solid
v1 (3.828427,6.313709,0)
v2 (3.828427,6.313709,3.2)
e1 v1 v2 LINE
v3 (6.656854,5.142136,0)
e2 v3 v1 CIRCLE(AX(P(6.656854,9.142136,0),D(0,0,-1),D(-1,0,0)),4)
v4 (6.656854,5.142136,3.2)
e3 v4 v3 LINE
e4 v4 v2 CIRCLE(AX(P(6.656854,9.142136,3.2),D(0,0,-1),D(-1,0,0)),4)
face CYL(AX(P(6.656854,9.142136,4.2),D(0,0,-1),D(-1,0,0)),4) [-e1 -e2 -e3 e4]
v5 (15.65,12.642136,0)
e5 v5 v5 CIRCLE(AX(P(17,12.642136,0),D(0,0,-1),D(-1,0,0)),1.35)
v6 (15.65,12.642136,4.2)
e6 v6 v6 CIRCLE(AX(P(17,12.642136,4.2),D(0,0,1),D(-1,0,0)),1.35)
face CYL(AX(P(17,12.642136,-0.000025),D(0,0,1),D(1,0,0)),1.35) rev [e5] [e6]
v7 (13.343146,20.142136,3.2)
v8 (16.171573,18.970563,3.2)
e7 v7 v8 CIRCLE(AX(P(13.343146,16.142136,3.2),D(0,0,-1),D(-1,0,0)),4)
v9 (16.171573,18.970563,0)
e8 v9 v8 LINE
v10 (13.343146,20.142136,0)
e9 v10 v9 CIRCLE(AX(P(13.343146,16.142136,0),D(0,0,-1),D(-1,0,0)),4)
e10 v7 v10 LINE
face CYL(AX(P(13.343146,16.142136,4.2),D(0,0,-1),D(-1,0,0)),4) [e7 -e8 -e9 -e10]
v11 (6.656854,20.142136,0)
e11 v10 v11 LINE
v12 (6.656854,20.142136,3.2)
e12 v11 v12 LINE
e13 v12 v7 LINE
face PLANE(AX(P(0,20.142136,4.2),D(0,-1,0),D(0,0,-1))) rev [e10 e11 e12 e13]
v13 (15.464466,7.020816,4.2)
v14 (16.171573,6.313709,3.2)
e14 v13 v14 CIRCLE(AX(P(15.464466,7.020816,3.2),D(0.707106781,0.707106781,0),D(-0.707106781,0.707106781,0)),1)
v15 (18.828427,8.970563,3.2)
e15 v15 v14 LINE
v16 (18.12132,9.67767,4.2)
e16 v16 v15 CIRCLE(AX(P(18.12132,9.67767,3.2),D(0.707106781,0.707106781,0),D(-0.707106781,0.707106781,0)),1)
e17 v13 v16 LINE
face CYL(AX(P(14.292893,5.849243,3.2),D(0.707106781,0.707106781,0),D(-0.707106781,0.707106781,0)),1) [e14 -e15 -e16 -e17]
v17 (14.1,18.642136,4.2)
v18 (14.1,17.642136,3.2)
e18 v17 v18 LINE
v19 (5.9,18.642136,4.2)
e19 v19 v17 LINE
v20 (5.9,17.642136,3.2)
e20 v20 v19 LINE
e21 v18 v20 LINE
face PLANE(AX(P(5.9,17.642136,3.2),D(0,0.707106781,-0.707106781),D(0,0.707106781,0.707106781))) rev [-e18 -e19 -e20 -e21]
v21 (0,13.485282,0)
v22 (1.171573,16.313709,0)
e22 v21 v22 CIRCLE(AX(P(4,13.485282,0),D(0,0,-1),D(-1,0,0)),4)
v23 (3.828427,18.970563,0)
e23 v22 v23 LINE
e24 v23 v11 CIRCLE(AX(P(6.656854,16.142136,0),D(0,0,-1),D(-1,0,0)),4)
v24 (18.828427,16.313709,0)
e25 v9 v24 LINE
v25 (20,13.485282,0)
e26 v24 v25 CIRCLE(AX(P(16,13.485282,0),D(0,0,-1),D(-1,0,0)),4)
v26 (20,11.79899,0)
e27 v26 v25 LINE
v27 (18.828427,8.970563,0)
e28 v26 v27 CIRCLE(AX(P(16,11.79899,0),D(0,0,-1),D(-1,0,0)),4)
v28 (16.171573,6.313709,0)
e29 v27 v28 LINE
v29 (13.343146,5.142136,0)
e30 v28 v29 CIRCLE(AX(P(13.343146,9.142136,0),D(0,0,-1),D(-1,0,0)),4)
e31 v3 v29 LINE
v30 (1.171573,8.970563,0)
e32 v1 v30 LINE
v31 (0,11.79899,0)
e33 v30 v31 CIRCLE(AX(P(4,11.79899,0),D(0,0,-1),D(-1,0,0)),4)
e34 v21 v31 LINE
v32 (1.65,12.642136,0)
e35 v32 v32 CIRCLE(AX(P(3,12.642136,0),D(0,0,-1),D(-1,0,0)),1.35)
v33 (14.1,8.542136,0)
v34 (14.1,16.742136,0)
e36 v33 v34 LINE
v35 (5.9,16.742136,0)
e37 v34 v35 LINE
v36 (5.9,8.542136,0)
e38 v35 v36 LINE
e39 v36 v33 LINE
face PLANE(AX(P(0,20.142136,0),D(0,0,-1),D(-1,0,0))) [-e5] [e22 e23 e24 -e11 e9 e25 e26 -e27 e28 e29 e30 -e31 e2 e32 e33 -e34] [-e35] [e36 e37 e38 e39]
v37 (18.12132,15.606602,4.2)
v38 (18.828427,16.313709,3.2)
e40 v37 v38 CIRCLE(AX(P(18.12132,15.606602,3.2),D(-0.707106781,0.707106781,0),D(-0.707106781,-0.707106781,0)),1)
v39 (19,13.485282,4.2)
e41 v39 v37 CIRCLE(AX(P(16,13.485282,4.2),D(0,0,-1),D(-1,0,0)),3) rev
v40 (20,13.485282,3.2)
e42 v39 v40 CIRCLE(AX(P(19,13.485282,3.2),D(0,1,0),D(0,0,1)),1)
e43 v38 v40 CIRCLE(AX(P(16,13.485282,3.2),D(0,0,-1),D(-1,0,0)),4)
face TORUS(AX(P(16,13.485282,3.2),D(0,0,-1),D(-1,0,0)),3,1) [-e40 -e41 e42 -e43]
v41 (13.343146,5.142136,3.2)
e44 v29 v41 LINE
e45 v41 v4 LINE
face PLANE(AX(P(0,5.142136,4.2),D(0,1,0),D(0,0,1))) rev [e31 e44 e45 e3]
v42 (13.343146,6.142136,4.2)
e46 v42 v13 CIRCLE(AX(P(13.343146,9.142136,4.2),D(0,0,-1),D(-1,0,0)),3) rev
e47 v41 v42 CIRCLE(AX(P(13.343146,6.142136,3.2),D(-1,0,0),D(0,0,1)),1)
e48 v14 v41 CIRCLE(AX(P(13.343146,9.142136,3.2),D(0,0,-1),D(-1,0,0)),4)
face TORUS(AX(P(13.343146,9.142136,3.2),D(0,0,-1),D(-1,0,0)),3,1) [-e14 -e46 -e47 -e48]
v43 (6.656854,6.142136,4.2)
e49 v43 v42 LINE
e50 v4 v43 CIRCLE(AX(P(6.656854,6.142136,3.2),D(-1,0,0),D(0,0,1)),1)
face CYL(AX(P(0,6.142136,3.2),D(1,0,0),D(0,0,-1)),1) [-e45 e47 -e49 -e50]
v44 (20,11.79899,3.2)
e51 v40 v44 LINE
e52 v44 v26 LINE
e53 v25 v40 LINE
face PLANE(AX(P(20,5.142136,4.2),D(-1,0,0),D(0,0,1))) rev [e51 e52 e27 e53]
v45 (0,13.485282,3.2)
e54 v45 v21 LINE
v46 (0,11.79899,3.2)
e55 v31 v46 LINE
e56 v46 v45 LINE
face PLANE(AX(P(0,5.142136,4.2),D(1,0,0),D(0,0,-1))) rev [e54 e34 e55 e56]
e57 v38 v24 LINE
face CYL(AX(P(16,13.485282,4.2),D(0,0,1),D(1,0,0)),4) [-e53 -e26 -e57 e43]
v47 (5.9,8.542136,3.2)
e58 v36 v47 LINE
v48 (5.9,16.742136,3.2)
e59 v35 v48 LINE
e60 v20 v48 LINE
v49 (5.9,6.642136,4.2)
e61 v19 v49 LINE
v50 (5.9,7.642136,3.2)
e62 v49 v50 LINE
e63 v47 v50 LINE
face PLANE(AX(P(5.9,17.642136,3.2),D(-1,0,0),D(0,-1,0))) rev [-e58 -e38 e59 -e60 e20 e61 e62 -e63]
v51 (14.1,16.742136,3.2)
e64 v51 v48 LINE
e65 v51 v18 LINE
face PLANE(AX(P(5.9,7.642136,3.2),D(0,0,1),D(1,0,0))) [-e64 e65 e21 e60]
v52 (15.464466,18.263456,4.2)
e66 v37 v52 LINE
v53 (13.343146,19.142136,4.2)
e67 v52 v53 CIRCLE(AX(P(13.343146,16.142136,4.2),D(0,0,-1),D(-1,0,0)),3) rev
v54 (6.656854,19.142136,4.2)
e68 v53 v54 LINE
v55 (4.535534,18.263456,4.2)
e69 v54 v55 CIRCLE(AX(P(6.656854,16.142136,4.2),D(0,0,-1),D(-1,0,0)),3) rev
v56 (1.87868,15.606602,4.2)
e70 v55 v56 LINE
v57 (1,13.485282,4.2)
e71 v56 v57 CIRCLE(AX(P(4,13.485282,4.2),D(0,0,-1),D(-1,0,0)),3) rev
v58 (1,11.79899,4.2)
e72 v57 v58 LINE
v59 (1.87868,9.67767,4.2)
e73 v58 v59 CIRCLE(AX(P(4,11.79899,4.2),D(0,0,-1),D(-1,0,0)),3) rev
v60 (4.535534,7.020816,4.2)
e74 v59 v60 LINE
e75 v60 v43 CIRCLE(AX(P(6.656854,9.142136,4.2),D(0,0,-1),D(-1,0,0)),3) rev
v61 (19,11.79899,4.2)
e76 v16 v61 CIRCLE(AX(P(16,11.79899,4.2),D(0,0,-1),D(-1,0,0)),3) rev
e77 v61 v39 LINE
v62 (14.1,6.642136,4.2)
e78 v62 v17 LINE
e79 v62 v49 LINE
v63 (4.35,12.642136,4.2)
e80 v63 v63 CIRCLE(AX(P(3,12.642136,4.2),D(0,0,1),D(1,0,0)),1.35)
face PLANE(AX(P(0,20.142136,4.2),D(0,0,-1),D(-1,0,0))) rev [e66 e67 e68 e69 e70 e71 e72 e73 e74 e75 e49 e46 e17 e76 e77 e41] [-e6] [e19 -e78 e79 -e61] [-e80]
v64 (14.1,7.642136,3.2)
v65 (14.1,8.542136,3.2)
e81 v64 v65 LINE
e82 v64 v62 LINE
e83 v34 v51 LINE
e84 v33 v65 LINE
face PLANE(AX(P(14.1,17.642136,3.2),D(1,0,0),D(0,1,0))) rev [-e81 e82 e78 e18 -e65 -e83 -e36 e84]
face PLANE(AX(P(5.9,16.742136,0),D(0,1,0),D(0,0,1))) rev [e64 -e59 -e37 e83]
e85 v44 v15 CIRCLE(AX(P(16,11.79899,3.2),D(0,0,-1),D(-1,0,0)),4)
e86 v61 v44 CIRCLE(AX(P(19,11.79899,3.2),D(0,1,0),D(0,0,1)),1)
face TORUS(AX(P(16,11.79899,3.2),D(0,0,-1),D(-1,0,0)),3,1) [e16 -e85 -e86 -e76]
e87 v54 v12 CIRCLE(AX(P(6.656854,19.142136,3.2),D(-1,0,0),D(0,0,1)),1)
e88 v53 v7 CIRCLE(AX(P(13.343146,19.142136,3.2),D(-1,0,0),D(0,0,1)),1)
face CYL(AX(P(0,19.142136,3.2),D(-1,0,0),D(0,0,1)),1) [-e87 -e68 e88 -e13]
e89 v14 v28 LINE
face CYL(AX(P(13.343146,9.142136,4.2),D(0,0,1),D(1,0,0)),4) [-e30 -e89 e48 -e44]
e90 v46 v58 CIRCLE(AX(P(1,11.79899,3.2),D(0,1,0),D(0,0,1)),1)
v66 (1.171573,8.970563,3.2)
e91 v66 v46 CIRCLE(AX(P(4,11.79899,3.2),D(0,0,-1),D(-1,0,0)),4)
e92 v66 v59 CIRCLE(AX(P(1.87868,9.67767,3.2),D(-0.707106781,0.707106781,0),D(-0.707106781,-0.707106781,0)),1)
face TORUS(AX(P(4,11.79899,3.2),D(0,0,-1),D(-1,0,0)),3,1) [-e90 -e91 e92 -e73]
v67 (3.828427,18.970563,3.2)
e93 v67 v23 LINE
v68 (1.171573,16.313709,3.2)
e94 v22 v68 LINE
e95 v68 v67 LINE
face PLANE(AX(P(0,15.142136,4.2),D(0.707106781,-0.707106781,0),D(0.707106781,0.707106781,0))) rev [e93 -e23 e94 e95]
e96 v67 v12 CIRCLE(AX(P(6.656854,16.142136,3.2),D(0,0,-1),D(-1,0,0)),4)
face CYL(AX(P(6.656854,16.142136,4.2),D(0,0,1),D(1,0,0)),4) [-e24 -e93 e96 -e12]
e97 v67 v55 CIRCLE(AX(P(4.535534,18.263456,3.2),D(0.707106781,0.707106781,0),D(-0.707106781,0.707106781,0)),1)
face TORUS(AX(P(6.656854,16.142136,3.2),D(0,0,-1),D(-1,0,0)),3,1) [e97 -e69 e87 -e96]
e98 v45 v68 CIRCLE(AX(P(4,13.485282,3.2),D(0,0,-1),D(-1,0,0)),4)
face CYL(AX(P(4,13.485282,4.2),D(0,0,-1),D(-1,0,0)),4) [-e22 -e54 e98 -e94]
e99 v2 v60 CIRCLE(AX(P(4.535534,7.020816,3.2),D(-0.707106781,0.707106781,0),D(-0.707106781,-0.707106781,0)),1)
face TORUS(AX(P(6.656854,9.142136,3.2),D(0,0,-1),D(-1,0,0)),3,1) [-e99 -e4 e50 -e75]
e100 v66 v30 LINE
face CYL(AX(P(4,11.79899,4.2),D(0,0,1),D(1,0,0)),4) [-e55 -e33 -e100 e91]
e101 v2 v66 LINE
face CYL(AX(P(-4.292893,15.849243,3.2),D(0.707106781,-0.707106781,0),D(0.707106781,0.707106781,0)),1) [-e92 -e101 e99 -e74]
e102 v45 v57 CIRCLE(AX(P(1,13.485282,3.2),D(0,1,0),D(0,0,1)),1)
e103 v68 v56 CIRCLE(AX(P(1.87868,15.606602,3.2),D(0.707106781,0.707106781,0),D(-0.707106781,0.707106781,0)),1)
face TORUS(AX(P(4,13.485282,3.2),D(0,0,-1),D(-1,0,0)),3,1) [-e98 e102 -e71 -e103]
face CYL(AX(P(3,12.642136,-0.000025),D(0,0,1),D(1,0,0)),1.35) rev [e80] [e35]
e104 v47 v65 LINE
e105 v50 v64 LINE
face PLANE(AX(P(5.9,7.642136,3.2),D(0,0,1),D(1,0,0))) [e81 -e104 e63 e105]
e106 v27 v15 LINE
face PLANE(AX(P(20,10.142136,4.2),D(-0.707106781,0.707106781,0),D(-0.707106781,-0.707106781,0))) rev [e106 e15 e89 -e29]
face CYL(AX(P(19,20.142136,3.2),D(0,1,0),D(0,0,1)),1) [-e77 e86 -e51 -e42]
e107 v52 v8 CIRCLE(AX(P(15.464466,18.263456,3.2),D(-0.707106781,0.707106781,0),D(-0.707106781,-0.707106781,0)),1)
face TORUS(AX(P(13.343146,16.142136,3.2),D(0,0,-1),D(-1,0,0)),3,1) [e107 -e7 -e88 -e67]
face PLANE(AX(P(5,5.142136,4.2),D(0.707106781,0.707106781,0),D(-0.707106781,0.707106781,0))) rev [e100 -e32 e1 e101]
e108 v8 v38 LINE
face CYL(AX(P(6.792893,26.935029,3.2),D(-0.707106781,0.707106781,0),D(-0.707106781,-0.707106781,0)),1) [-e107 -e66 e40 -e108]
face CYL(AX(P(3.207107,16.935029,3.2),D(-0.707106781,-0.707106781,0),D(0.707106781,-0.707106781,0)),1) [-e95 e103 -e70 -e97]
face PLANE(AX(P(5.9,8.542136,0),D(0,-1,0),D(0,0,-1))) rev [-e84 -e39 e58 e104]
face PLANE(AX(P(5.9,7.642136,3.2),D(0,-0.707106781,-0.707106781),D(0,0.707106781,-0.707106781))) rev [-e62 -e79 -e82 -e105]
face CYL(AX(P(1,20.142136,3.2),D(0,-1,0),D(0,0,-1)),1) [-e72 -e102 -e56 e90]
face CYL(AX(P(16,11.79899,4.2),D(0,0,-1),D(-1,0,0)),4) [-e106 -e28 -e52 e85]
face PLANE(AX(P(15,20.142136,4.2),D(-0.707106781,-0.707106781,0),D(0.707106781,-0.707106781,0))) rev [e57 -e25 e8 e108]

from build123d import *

# Parameters (mm, degrees)
SKETCH1_W           = 20
SKETCH1_H           = 15
BOSS_EXTRUDE1_DEPTH = 4.2
SKETCH2_W           = 8.2
SKETCH2_H           = 10
CUT_EXTRUDE1_DEPTH  = 1
SKETCH3_W           = 8.2
SKETCH3_H           = 8.2
CUT_EXTRUDE2_DEPTH  = 29.564762277
CHAMFER1_SIZE       = 1
SKETCH4_R           = 1.35
CUT_EXTRUDE3_DEPTH  = 29.694000139
CHAMFER2_SIZE       = 5
FILLET1_R           = 4
FILLET2_R           = 1


with BuildPart() as part:
    # Sketch1 → Boss-Extrude1 (new body)
    with BuildSketch(Plane.XY):
        with Locations((10, 12.642136033)):
            Rectangle(SKETCH1_W, SKETCH1_H)
    extrude(amount=BOSS_EXTRUDE1_DEPTH)

    # Sketch2 → Cut-Extrude1 (cut)
    with BuildSketch(Plane.XY.offset(4.2)):
        with Locations((10, 12.642136033)):
            Rectangle(SKETCH2_W, SKETCH2_H)
    extrude(amount=-CUT_EXTRUDE1_DEPTH, mode=Mode.SUBTRACT)

    # Sketch3 → Cut-Extrude2 (cut, through all)
    with BuildSketch(Plane.XY.offset(3.2)):
        with Locations((10, 12.642136033)):
            Rectangle(SKETCH3_W, SKETCH3_H)
    extrude(amount=-CUT_EXTRUDE2_DEPTH, mode=Mode.SUBTRACT)

    # Chamfer1
    chamfer1_edges = [part.edges().sort_by_distance(p)[0] for p in [
        (10, 7.642136033, 4.2),
        (10, 17.642136033, 4.2),
    ]]
    chamfer(chamfer1_edges, length=CHAMFER1_SIZE - 0.0001)  # a hair under: the kernel refuses the full size

    # Sketch4 → Cut-Extrude3 (cut, through all)
    with BuildSketch(Plane.XY.offset(4.2)):
        with Locations((3, 12.642136033)):
            Circle(SKETCH4_R)
        with Locations(Location((17, 12.642136033, 0), (0, 0, 180))):
            Circle(SKETCH4_R)
    extrude(amount=-CUT_EXTRUDE3_DEPTH, mode=Mode.SUBTRACT)

    # Chamfer2
    chamfer2_edges = [part.edges().sort_by_distance(p)[0] for p in [
        (0, 20.142136033, 2.1),
        (20, 20.142136033, 2.1),
        (20, 5.142136033, 2.1),
        (0, 5.142136033, 2.1),
    ]]
    chamfer(chamfer2_edges, length=CHAMFER2_SIZE)

    # Fillet1
    fillet1_edges = [part.edges().sort_by_distance(p)[0] for p in [
        (0, 10.142136033, 2.1),
        (0, 15.142136033, 2.1),
        (15, 20.142136033, 2.1),
        (5, 20.142136033, 2.1),
        (15, 5.142136033, 2.1),
        (5, 5.142136033, 2.1),
        (20, 15.142136033, 2.1),
        (20, 10.142136033, 2.1),
    ]]
    fillet(fillet1_edges, radius=FILLET1_R)

    # Fillet2
    fillet2_edges = [part.edges().sort_by_distance(p)[0] for p in [
        (2.5, 17.642136033, 4.2),
        (10, 20.142136033, 4.2),
        (2.5, 7.642136033, 4.2),
        (10, 5.142136033, 4.2),
        (17.5, 7.642136033, 4.2),
        (20, 12.642136033, 4.2),
        (17.5, 17.642136033, 4.2),
        (0.30448187, 10.268256553, 4.2),
        (5.12612052, 5.446617903, 4.2),
        (14.87387948, 5.446617903, 4.2),
        (19.69551813, 10.268256553, 4.2),
        (19.69551813, 15.016015513, 4.2),
        (14.87387948, 19.837654163, 4.2),
        (5.12612052, 19.837654163, 4.2),
        (0.30448187, 15.016015513, 4.2),
        (0, 12.642136033, 4.2),
    ]]
    fillet(fillet2_edges, radius=FILLET2_R)


solid = part.part
